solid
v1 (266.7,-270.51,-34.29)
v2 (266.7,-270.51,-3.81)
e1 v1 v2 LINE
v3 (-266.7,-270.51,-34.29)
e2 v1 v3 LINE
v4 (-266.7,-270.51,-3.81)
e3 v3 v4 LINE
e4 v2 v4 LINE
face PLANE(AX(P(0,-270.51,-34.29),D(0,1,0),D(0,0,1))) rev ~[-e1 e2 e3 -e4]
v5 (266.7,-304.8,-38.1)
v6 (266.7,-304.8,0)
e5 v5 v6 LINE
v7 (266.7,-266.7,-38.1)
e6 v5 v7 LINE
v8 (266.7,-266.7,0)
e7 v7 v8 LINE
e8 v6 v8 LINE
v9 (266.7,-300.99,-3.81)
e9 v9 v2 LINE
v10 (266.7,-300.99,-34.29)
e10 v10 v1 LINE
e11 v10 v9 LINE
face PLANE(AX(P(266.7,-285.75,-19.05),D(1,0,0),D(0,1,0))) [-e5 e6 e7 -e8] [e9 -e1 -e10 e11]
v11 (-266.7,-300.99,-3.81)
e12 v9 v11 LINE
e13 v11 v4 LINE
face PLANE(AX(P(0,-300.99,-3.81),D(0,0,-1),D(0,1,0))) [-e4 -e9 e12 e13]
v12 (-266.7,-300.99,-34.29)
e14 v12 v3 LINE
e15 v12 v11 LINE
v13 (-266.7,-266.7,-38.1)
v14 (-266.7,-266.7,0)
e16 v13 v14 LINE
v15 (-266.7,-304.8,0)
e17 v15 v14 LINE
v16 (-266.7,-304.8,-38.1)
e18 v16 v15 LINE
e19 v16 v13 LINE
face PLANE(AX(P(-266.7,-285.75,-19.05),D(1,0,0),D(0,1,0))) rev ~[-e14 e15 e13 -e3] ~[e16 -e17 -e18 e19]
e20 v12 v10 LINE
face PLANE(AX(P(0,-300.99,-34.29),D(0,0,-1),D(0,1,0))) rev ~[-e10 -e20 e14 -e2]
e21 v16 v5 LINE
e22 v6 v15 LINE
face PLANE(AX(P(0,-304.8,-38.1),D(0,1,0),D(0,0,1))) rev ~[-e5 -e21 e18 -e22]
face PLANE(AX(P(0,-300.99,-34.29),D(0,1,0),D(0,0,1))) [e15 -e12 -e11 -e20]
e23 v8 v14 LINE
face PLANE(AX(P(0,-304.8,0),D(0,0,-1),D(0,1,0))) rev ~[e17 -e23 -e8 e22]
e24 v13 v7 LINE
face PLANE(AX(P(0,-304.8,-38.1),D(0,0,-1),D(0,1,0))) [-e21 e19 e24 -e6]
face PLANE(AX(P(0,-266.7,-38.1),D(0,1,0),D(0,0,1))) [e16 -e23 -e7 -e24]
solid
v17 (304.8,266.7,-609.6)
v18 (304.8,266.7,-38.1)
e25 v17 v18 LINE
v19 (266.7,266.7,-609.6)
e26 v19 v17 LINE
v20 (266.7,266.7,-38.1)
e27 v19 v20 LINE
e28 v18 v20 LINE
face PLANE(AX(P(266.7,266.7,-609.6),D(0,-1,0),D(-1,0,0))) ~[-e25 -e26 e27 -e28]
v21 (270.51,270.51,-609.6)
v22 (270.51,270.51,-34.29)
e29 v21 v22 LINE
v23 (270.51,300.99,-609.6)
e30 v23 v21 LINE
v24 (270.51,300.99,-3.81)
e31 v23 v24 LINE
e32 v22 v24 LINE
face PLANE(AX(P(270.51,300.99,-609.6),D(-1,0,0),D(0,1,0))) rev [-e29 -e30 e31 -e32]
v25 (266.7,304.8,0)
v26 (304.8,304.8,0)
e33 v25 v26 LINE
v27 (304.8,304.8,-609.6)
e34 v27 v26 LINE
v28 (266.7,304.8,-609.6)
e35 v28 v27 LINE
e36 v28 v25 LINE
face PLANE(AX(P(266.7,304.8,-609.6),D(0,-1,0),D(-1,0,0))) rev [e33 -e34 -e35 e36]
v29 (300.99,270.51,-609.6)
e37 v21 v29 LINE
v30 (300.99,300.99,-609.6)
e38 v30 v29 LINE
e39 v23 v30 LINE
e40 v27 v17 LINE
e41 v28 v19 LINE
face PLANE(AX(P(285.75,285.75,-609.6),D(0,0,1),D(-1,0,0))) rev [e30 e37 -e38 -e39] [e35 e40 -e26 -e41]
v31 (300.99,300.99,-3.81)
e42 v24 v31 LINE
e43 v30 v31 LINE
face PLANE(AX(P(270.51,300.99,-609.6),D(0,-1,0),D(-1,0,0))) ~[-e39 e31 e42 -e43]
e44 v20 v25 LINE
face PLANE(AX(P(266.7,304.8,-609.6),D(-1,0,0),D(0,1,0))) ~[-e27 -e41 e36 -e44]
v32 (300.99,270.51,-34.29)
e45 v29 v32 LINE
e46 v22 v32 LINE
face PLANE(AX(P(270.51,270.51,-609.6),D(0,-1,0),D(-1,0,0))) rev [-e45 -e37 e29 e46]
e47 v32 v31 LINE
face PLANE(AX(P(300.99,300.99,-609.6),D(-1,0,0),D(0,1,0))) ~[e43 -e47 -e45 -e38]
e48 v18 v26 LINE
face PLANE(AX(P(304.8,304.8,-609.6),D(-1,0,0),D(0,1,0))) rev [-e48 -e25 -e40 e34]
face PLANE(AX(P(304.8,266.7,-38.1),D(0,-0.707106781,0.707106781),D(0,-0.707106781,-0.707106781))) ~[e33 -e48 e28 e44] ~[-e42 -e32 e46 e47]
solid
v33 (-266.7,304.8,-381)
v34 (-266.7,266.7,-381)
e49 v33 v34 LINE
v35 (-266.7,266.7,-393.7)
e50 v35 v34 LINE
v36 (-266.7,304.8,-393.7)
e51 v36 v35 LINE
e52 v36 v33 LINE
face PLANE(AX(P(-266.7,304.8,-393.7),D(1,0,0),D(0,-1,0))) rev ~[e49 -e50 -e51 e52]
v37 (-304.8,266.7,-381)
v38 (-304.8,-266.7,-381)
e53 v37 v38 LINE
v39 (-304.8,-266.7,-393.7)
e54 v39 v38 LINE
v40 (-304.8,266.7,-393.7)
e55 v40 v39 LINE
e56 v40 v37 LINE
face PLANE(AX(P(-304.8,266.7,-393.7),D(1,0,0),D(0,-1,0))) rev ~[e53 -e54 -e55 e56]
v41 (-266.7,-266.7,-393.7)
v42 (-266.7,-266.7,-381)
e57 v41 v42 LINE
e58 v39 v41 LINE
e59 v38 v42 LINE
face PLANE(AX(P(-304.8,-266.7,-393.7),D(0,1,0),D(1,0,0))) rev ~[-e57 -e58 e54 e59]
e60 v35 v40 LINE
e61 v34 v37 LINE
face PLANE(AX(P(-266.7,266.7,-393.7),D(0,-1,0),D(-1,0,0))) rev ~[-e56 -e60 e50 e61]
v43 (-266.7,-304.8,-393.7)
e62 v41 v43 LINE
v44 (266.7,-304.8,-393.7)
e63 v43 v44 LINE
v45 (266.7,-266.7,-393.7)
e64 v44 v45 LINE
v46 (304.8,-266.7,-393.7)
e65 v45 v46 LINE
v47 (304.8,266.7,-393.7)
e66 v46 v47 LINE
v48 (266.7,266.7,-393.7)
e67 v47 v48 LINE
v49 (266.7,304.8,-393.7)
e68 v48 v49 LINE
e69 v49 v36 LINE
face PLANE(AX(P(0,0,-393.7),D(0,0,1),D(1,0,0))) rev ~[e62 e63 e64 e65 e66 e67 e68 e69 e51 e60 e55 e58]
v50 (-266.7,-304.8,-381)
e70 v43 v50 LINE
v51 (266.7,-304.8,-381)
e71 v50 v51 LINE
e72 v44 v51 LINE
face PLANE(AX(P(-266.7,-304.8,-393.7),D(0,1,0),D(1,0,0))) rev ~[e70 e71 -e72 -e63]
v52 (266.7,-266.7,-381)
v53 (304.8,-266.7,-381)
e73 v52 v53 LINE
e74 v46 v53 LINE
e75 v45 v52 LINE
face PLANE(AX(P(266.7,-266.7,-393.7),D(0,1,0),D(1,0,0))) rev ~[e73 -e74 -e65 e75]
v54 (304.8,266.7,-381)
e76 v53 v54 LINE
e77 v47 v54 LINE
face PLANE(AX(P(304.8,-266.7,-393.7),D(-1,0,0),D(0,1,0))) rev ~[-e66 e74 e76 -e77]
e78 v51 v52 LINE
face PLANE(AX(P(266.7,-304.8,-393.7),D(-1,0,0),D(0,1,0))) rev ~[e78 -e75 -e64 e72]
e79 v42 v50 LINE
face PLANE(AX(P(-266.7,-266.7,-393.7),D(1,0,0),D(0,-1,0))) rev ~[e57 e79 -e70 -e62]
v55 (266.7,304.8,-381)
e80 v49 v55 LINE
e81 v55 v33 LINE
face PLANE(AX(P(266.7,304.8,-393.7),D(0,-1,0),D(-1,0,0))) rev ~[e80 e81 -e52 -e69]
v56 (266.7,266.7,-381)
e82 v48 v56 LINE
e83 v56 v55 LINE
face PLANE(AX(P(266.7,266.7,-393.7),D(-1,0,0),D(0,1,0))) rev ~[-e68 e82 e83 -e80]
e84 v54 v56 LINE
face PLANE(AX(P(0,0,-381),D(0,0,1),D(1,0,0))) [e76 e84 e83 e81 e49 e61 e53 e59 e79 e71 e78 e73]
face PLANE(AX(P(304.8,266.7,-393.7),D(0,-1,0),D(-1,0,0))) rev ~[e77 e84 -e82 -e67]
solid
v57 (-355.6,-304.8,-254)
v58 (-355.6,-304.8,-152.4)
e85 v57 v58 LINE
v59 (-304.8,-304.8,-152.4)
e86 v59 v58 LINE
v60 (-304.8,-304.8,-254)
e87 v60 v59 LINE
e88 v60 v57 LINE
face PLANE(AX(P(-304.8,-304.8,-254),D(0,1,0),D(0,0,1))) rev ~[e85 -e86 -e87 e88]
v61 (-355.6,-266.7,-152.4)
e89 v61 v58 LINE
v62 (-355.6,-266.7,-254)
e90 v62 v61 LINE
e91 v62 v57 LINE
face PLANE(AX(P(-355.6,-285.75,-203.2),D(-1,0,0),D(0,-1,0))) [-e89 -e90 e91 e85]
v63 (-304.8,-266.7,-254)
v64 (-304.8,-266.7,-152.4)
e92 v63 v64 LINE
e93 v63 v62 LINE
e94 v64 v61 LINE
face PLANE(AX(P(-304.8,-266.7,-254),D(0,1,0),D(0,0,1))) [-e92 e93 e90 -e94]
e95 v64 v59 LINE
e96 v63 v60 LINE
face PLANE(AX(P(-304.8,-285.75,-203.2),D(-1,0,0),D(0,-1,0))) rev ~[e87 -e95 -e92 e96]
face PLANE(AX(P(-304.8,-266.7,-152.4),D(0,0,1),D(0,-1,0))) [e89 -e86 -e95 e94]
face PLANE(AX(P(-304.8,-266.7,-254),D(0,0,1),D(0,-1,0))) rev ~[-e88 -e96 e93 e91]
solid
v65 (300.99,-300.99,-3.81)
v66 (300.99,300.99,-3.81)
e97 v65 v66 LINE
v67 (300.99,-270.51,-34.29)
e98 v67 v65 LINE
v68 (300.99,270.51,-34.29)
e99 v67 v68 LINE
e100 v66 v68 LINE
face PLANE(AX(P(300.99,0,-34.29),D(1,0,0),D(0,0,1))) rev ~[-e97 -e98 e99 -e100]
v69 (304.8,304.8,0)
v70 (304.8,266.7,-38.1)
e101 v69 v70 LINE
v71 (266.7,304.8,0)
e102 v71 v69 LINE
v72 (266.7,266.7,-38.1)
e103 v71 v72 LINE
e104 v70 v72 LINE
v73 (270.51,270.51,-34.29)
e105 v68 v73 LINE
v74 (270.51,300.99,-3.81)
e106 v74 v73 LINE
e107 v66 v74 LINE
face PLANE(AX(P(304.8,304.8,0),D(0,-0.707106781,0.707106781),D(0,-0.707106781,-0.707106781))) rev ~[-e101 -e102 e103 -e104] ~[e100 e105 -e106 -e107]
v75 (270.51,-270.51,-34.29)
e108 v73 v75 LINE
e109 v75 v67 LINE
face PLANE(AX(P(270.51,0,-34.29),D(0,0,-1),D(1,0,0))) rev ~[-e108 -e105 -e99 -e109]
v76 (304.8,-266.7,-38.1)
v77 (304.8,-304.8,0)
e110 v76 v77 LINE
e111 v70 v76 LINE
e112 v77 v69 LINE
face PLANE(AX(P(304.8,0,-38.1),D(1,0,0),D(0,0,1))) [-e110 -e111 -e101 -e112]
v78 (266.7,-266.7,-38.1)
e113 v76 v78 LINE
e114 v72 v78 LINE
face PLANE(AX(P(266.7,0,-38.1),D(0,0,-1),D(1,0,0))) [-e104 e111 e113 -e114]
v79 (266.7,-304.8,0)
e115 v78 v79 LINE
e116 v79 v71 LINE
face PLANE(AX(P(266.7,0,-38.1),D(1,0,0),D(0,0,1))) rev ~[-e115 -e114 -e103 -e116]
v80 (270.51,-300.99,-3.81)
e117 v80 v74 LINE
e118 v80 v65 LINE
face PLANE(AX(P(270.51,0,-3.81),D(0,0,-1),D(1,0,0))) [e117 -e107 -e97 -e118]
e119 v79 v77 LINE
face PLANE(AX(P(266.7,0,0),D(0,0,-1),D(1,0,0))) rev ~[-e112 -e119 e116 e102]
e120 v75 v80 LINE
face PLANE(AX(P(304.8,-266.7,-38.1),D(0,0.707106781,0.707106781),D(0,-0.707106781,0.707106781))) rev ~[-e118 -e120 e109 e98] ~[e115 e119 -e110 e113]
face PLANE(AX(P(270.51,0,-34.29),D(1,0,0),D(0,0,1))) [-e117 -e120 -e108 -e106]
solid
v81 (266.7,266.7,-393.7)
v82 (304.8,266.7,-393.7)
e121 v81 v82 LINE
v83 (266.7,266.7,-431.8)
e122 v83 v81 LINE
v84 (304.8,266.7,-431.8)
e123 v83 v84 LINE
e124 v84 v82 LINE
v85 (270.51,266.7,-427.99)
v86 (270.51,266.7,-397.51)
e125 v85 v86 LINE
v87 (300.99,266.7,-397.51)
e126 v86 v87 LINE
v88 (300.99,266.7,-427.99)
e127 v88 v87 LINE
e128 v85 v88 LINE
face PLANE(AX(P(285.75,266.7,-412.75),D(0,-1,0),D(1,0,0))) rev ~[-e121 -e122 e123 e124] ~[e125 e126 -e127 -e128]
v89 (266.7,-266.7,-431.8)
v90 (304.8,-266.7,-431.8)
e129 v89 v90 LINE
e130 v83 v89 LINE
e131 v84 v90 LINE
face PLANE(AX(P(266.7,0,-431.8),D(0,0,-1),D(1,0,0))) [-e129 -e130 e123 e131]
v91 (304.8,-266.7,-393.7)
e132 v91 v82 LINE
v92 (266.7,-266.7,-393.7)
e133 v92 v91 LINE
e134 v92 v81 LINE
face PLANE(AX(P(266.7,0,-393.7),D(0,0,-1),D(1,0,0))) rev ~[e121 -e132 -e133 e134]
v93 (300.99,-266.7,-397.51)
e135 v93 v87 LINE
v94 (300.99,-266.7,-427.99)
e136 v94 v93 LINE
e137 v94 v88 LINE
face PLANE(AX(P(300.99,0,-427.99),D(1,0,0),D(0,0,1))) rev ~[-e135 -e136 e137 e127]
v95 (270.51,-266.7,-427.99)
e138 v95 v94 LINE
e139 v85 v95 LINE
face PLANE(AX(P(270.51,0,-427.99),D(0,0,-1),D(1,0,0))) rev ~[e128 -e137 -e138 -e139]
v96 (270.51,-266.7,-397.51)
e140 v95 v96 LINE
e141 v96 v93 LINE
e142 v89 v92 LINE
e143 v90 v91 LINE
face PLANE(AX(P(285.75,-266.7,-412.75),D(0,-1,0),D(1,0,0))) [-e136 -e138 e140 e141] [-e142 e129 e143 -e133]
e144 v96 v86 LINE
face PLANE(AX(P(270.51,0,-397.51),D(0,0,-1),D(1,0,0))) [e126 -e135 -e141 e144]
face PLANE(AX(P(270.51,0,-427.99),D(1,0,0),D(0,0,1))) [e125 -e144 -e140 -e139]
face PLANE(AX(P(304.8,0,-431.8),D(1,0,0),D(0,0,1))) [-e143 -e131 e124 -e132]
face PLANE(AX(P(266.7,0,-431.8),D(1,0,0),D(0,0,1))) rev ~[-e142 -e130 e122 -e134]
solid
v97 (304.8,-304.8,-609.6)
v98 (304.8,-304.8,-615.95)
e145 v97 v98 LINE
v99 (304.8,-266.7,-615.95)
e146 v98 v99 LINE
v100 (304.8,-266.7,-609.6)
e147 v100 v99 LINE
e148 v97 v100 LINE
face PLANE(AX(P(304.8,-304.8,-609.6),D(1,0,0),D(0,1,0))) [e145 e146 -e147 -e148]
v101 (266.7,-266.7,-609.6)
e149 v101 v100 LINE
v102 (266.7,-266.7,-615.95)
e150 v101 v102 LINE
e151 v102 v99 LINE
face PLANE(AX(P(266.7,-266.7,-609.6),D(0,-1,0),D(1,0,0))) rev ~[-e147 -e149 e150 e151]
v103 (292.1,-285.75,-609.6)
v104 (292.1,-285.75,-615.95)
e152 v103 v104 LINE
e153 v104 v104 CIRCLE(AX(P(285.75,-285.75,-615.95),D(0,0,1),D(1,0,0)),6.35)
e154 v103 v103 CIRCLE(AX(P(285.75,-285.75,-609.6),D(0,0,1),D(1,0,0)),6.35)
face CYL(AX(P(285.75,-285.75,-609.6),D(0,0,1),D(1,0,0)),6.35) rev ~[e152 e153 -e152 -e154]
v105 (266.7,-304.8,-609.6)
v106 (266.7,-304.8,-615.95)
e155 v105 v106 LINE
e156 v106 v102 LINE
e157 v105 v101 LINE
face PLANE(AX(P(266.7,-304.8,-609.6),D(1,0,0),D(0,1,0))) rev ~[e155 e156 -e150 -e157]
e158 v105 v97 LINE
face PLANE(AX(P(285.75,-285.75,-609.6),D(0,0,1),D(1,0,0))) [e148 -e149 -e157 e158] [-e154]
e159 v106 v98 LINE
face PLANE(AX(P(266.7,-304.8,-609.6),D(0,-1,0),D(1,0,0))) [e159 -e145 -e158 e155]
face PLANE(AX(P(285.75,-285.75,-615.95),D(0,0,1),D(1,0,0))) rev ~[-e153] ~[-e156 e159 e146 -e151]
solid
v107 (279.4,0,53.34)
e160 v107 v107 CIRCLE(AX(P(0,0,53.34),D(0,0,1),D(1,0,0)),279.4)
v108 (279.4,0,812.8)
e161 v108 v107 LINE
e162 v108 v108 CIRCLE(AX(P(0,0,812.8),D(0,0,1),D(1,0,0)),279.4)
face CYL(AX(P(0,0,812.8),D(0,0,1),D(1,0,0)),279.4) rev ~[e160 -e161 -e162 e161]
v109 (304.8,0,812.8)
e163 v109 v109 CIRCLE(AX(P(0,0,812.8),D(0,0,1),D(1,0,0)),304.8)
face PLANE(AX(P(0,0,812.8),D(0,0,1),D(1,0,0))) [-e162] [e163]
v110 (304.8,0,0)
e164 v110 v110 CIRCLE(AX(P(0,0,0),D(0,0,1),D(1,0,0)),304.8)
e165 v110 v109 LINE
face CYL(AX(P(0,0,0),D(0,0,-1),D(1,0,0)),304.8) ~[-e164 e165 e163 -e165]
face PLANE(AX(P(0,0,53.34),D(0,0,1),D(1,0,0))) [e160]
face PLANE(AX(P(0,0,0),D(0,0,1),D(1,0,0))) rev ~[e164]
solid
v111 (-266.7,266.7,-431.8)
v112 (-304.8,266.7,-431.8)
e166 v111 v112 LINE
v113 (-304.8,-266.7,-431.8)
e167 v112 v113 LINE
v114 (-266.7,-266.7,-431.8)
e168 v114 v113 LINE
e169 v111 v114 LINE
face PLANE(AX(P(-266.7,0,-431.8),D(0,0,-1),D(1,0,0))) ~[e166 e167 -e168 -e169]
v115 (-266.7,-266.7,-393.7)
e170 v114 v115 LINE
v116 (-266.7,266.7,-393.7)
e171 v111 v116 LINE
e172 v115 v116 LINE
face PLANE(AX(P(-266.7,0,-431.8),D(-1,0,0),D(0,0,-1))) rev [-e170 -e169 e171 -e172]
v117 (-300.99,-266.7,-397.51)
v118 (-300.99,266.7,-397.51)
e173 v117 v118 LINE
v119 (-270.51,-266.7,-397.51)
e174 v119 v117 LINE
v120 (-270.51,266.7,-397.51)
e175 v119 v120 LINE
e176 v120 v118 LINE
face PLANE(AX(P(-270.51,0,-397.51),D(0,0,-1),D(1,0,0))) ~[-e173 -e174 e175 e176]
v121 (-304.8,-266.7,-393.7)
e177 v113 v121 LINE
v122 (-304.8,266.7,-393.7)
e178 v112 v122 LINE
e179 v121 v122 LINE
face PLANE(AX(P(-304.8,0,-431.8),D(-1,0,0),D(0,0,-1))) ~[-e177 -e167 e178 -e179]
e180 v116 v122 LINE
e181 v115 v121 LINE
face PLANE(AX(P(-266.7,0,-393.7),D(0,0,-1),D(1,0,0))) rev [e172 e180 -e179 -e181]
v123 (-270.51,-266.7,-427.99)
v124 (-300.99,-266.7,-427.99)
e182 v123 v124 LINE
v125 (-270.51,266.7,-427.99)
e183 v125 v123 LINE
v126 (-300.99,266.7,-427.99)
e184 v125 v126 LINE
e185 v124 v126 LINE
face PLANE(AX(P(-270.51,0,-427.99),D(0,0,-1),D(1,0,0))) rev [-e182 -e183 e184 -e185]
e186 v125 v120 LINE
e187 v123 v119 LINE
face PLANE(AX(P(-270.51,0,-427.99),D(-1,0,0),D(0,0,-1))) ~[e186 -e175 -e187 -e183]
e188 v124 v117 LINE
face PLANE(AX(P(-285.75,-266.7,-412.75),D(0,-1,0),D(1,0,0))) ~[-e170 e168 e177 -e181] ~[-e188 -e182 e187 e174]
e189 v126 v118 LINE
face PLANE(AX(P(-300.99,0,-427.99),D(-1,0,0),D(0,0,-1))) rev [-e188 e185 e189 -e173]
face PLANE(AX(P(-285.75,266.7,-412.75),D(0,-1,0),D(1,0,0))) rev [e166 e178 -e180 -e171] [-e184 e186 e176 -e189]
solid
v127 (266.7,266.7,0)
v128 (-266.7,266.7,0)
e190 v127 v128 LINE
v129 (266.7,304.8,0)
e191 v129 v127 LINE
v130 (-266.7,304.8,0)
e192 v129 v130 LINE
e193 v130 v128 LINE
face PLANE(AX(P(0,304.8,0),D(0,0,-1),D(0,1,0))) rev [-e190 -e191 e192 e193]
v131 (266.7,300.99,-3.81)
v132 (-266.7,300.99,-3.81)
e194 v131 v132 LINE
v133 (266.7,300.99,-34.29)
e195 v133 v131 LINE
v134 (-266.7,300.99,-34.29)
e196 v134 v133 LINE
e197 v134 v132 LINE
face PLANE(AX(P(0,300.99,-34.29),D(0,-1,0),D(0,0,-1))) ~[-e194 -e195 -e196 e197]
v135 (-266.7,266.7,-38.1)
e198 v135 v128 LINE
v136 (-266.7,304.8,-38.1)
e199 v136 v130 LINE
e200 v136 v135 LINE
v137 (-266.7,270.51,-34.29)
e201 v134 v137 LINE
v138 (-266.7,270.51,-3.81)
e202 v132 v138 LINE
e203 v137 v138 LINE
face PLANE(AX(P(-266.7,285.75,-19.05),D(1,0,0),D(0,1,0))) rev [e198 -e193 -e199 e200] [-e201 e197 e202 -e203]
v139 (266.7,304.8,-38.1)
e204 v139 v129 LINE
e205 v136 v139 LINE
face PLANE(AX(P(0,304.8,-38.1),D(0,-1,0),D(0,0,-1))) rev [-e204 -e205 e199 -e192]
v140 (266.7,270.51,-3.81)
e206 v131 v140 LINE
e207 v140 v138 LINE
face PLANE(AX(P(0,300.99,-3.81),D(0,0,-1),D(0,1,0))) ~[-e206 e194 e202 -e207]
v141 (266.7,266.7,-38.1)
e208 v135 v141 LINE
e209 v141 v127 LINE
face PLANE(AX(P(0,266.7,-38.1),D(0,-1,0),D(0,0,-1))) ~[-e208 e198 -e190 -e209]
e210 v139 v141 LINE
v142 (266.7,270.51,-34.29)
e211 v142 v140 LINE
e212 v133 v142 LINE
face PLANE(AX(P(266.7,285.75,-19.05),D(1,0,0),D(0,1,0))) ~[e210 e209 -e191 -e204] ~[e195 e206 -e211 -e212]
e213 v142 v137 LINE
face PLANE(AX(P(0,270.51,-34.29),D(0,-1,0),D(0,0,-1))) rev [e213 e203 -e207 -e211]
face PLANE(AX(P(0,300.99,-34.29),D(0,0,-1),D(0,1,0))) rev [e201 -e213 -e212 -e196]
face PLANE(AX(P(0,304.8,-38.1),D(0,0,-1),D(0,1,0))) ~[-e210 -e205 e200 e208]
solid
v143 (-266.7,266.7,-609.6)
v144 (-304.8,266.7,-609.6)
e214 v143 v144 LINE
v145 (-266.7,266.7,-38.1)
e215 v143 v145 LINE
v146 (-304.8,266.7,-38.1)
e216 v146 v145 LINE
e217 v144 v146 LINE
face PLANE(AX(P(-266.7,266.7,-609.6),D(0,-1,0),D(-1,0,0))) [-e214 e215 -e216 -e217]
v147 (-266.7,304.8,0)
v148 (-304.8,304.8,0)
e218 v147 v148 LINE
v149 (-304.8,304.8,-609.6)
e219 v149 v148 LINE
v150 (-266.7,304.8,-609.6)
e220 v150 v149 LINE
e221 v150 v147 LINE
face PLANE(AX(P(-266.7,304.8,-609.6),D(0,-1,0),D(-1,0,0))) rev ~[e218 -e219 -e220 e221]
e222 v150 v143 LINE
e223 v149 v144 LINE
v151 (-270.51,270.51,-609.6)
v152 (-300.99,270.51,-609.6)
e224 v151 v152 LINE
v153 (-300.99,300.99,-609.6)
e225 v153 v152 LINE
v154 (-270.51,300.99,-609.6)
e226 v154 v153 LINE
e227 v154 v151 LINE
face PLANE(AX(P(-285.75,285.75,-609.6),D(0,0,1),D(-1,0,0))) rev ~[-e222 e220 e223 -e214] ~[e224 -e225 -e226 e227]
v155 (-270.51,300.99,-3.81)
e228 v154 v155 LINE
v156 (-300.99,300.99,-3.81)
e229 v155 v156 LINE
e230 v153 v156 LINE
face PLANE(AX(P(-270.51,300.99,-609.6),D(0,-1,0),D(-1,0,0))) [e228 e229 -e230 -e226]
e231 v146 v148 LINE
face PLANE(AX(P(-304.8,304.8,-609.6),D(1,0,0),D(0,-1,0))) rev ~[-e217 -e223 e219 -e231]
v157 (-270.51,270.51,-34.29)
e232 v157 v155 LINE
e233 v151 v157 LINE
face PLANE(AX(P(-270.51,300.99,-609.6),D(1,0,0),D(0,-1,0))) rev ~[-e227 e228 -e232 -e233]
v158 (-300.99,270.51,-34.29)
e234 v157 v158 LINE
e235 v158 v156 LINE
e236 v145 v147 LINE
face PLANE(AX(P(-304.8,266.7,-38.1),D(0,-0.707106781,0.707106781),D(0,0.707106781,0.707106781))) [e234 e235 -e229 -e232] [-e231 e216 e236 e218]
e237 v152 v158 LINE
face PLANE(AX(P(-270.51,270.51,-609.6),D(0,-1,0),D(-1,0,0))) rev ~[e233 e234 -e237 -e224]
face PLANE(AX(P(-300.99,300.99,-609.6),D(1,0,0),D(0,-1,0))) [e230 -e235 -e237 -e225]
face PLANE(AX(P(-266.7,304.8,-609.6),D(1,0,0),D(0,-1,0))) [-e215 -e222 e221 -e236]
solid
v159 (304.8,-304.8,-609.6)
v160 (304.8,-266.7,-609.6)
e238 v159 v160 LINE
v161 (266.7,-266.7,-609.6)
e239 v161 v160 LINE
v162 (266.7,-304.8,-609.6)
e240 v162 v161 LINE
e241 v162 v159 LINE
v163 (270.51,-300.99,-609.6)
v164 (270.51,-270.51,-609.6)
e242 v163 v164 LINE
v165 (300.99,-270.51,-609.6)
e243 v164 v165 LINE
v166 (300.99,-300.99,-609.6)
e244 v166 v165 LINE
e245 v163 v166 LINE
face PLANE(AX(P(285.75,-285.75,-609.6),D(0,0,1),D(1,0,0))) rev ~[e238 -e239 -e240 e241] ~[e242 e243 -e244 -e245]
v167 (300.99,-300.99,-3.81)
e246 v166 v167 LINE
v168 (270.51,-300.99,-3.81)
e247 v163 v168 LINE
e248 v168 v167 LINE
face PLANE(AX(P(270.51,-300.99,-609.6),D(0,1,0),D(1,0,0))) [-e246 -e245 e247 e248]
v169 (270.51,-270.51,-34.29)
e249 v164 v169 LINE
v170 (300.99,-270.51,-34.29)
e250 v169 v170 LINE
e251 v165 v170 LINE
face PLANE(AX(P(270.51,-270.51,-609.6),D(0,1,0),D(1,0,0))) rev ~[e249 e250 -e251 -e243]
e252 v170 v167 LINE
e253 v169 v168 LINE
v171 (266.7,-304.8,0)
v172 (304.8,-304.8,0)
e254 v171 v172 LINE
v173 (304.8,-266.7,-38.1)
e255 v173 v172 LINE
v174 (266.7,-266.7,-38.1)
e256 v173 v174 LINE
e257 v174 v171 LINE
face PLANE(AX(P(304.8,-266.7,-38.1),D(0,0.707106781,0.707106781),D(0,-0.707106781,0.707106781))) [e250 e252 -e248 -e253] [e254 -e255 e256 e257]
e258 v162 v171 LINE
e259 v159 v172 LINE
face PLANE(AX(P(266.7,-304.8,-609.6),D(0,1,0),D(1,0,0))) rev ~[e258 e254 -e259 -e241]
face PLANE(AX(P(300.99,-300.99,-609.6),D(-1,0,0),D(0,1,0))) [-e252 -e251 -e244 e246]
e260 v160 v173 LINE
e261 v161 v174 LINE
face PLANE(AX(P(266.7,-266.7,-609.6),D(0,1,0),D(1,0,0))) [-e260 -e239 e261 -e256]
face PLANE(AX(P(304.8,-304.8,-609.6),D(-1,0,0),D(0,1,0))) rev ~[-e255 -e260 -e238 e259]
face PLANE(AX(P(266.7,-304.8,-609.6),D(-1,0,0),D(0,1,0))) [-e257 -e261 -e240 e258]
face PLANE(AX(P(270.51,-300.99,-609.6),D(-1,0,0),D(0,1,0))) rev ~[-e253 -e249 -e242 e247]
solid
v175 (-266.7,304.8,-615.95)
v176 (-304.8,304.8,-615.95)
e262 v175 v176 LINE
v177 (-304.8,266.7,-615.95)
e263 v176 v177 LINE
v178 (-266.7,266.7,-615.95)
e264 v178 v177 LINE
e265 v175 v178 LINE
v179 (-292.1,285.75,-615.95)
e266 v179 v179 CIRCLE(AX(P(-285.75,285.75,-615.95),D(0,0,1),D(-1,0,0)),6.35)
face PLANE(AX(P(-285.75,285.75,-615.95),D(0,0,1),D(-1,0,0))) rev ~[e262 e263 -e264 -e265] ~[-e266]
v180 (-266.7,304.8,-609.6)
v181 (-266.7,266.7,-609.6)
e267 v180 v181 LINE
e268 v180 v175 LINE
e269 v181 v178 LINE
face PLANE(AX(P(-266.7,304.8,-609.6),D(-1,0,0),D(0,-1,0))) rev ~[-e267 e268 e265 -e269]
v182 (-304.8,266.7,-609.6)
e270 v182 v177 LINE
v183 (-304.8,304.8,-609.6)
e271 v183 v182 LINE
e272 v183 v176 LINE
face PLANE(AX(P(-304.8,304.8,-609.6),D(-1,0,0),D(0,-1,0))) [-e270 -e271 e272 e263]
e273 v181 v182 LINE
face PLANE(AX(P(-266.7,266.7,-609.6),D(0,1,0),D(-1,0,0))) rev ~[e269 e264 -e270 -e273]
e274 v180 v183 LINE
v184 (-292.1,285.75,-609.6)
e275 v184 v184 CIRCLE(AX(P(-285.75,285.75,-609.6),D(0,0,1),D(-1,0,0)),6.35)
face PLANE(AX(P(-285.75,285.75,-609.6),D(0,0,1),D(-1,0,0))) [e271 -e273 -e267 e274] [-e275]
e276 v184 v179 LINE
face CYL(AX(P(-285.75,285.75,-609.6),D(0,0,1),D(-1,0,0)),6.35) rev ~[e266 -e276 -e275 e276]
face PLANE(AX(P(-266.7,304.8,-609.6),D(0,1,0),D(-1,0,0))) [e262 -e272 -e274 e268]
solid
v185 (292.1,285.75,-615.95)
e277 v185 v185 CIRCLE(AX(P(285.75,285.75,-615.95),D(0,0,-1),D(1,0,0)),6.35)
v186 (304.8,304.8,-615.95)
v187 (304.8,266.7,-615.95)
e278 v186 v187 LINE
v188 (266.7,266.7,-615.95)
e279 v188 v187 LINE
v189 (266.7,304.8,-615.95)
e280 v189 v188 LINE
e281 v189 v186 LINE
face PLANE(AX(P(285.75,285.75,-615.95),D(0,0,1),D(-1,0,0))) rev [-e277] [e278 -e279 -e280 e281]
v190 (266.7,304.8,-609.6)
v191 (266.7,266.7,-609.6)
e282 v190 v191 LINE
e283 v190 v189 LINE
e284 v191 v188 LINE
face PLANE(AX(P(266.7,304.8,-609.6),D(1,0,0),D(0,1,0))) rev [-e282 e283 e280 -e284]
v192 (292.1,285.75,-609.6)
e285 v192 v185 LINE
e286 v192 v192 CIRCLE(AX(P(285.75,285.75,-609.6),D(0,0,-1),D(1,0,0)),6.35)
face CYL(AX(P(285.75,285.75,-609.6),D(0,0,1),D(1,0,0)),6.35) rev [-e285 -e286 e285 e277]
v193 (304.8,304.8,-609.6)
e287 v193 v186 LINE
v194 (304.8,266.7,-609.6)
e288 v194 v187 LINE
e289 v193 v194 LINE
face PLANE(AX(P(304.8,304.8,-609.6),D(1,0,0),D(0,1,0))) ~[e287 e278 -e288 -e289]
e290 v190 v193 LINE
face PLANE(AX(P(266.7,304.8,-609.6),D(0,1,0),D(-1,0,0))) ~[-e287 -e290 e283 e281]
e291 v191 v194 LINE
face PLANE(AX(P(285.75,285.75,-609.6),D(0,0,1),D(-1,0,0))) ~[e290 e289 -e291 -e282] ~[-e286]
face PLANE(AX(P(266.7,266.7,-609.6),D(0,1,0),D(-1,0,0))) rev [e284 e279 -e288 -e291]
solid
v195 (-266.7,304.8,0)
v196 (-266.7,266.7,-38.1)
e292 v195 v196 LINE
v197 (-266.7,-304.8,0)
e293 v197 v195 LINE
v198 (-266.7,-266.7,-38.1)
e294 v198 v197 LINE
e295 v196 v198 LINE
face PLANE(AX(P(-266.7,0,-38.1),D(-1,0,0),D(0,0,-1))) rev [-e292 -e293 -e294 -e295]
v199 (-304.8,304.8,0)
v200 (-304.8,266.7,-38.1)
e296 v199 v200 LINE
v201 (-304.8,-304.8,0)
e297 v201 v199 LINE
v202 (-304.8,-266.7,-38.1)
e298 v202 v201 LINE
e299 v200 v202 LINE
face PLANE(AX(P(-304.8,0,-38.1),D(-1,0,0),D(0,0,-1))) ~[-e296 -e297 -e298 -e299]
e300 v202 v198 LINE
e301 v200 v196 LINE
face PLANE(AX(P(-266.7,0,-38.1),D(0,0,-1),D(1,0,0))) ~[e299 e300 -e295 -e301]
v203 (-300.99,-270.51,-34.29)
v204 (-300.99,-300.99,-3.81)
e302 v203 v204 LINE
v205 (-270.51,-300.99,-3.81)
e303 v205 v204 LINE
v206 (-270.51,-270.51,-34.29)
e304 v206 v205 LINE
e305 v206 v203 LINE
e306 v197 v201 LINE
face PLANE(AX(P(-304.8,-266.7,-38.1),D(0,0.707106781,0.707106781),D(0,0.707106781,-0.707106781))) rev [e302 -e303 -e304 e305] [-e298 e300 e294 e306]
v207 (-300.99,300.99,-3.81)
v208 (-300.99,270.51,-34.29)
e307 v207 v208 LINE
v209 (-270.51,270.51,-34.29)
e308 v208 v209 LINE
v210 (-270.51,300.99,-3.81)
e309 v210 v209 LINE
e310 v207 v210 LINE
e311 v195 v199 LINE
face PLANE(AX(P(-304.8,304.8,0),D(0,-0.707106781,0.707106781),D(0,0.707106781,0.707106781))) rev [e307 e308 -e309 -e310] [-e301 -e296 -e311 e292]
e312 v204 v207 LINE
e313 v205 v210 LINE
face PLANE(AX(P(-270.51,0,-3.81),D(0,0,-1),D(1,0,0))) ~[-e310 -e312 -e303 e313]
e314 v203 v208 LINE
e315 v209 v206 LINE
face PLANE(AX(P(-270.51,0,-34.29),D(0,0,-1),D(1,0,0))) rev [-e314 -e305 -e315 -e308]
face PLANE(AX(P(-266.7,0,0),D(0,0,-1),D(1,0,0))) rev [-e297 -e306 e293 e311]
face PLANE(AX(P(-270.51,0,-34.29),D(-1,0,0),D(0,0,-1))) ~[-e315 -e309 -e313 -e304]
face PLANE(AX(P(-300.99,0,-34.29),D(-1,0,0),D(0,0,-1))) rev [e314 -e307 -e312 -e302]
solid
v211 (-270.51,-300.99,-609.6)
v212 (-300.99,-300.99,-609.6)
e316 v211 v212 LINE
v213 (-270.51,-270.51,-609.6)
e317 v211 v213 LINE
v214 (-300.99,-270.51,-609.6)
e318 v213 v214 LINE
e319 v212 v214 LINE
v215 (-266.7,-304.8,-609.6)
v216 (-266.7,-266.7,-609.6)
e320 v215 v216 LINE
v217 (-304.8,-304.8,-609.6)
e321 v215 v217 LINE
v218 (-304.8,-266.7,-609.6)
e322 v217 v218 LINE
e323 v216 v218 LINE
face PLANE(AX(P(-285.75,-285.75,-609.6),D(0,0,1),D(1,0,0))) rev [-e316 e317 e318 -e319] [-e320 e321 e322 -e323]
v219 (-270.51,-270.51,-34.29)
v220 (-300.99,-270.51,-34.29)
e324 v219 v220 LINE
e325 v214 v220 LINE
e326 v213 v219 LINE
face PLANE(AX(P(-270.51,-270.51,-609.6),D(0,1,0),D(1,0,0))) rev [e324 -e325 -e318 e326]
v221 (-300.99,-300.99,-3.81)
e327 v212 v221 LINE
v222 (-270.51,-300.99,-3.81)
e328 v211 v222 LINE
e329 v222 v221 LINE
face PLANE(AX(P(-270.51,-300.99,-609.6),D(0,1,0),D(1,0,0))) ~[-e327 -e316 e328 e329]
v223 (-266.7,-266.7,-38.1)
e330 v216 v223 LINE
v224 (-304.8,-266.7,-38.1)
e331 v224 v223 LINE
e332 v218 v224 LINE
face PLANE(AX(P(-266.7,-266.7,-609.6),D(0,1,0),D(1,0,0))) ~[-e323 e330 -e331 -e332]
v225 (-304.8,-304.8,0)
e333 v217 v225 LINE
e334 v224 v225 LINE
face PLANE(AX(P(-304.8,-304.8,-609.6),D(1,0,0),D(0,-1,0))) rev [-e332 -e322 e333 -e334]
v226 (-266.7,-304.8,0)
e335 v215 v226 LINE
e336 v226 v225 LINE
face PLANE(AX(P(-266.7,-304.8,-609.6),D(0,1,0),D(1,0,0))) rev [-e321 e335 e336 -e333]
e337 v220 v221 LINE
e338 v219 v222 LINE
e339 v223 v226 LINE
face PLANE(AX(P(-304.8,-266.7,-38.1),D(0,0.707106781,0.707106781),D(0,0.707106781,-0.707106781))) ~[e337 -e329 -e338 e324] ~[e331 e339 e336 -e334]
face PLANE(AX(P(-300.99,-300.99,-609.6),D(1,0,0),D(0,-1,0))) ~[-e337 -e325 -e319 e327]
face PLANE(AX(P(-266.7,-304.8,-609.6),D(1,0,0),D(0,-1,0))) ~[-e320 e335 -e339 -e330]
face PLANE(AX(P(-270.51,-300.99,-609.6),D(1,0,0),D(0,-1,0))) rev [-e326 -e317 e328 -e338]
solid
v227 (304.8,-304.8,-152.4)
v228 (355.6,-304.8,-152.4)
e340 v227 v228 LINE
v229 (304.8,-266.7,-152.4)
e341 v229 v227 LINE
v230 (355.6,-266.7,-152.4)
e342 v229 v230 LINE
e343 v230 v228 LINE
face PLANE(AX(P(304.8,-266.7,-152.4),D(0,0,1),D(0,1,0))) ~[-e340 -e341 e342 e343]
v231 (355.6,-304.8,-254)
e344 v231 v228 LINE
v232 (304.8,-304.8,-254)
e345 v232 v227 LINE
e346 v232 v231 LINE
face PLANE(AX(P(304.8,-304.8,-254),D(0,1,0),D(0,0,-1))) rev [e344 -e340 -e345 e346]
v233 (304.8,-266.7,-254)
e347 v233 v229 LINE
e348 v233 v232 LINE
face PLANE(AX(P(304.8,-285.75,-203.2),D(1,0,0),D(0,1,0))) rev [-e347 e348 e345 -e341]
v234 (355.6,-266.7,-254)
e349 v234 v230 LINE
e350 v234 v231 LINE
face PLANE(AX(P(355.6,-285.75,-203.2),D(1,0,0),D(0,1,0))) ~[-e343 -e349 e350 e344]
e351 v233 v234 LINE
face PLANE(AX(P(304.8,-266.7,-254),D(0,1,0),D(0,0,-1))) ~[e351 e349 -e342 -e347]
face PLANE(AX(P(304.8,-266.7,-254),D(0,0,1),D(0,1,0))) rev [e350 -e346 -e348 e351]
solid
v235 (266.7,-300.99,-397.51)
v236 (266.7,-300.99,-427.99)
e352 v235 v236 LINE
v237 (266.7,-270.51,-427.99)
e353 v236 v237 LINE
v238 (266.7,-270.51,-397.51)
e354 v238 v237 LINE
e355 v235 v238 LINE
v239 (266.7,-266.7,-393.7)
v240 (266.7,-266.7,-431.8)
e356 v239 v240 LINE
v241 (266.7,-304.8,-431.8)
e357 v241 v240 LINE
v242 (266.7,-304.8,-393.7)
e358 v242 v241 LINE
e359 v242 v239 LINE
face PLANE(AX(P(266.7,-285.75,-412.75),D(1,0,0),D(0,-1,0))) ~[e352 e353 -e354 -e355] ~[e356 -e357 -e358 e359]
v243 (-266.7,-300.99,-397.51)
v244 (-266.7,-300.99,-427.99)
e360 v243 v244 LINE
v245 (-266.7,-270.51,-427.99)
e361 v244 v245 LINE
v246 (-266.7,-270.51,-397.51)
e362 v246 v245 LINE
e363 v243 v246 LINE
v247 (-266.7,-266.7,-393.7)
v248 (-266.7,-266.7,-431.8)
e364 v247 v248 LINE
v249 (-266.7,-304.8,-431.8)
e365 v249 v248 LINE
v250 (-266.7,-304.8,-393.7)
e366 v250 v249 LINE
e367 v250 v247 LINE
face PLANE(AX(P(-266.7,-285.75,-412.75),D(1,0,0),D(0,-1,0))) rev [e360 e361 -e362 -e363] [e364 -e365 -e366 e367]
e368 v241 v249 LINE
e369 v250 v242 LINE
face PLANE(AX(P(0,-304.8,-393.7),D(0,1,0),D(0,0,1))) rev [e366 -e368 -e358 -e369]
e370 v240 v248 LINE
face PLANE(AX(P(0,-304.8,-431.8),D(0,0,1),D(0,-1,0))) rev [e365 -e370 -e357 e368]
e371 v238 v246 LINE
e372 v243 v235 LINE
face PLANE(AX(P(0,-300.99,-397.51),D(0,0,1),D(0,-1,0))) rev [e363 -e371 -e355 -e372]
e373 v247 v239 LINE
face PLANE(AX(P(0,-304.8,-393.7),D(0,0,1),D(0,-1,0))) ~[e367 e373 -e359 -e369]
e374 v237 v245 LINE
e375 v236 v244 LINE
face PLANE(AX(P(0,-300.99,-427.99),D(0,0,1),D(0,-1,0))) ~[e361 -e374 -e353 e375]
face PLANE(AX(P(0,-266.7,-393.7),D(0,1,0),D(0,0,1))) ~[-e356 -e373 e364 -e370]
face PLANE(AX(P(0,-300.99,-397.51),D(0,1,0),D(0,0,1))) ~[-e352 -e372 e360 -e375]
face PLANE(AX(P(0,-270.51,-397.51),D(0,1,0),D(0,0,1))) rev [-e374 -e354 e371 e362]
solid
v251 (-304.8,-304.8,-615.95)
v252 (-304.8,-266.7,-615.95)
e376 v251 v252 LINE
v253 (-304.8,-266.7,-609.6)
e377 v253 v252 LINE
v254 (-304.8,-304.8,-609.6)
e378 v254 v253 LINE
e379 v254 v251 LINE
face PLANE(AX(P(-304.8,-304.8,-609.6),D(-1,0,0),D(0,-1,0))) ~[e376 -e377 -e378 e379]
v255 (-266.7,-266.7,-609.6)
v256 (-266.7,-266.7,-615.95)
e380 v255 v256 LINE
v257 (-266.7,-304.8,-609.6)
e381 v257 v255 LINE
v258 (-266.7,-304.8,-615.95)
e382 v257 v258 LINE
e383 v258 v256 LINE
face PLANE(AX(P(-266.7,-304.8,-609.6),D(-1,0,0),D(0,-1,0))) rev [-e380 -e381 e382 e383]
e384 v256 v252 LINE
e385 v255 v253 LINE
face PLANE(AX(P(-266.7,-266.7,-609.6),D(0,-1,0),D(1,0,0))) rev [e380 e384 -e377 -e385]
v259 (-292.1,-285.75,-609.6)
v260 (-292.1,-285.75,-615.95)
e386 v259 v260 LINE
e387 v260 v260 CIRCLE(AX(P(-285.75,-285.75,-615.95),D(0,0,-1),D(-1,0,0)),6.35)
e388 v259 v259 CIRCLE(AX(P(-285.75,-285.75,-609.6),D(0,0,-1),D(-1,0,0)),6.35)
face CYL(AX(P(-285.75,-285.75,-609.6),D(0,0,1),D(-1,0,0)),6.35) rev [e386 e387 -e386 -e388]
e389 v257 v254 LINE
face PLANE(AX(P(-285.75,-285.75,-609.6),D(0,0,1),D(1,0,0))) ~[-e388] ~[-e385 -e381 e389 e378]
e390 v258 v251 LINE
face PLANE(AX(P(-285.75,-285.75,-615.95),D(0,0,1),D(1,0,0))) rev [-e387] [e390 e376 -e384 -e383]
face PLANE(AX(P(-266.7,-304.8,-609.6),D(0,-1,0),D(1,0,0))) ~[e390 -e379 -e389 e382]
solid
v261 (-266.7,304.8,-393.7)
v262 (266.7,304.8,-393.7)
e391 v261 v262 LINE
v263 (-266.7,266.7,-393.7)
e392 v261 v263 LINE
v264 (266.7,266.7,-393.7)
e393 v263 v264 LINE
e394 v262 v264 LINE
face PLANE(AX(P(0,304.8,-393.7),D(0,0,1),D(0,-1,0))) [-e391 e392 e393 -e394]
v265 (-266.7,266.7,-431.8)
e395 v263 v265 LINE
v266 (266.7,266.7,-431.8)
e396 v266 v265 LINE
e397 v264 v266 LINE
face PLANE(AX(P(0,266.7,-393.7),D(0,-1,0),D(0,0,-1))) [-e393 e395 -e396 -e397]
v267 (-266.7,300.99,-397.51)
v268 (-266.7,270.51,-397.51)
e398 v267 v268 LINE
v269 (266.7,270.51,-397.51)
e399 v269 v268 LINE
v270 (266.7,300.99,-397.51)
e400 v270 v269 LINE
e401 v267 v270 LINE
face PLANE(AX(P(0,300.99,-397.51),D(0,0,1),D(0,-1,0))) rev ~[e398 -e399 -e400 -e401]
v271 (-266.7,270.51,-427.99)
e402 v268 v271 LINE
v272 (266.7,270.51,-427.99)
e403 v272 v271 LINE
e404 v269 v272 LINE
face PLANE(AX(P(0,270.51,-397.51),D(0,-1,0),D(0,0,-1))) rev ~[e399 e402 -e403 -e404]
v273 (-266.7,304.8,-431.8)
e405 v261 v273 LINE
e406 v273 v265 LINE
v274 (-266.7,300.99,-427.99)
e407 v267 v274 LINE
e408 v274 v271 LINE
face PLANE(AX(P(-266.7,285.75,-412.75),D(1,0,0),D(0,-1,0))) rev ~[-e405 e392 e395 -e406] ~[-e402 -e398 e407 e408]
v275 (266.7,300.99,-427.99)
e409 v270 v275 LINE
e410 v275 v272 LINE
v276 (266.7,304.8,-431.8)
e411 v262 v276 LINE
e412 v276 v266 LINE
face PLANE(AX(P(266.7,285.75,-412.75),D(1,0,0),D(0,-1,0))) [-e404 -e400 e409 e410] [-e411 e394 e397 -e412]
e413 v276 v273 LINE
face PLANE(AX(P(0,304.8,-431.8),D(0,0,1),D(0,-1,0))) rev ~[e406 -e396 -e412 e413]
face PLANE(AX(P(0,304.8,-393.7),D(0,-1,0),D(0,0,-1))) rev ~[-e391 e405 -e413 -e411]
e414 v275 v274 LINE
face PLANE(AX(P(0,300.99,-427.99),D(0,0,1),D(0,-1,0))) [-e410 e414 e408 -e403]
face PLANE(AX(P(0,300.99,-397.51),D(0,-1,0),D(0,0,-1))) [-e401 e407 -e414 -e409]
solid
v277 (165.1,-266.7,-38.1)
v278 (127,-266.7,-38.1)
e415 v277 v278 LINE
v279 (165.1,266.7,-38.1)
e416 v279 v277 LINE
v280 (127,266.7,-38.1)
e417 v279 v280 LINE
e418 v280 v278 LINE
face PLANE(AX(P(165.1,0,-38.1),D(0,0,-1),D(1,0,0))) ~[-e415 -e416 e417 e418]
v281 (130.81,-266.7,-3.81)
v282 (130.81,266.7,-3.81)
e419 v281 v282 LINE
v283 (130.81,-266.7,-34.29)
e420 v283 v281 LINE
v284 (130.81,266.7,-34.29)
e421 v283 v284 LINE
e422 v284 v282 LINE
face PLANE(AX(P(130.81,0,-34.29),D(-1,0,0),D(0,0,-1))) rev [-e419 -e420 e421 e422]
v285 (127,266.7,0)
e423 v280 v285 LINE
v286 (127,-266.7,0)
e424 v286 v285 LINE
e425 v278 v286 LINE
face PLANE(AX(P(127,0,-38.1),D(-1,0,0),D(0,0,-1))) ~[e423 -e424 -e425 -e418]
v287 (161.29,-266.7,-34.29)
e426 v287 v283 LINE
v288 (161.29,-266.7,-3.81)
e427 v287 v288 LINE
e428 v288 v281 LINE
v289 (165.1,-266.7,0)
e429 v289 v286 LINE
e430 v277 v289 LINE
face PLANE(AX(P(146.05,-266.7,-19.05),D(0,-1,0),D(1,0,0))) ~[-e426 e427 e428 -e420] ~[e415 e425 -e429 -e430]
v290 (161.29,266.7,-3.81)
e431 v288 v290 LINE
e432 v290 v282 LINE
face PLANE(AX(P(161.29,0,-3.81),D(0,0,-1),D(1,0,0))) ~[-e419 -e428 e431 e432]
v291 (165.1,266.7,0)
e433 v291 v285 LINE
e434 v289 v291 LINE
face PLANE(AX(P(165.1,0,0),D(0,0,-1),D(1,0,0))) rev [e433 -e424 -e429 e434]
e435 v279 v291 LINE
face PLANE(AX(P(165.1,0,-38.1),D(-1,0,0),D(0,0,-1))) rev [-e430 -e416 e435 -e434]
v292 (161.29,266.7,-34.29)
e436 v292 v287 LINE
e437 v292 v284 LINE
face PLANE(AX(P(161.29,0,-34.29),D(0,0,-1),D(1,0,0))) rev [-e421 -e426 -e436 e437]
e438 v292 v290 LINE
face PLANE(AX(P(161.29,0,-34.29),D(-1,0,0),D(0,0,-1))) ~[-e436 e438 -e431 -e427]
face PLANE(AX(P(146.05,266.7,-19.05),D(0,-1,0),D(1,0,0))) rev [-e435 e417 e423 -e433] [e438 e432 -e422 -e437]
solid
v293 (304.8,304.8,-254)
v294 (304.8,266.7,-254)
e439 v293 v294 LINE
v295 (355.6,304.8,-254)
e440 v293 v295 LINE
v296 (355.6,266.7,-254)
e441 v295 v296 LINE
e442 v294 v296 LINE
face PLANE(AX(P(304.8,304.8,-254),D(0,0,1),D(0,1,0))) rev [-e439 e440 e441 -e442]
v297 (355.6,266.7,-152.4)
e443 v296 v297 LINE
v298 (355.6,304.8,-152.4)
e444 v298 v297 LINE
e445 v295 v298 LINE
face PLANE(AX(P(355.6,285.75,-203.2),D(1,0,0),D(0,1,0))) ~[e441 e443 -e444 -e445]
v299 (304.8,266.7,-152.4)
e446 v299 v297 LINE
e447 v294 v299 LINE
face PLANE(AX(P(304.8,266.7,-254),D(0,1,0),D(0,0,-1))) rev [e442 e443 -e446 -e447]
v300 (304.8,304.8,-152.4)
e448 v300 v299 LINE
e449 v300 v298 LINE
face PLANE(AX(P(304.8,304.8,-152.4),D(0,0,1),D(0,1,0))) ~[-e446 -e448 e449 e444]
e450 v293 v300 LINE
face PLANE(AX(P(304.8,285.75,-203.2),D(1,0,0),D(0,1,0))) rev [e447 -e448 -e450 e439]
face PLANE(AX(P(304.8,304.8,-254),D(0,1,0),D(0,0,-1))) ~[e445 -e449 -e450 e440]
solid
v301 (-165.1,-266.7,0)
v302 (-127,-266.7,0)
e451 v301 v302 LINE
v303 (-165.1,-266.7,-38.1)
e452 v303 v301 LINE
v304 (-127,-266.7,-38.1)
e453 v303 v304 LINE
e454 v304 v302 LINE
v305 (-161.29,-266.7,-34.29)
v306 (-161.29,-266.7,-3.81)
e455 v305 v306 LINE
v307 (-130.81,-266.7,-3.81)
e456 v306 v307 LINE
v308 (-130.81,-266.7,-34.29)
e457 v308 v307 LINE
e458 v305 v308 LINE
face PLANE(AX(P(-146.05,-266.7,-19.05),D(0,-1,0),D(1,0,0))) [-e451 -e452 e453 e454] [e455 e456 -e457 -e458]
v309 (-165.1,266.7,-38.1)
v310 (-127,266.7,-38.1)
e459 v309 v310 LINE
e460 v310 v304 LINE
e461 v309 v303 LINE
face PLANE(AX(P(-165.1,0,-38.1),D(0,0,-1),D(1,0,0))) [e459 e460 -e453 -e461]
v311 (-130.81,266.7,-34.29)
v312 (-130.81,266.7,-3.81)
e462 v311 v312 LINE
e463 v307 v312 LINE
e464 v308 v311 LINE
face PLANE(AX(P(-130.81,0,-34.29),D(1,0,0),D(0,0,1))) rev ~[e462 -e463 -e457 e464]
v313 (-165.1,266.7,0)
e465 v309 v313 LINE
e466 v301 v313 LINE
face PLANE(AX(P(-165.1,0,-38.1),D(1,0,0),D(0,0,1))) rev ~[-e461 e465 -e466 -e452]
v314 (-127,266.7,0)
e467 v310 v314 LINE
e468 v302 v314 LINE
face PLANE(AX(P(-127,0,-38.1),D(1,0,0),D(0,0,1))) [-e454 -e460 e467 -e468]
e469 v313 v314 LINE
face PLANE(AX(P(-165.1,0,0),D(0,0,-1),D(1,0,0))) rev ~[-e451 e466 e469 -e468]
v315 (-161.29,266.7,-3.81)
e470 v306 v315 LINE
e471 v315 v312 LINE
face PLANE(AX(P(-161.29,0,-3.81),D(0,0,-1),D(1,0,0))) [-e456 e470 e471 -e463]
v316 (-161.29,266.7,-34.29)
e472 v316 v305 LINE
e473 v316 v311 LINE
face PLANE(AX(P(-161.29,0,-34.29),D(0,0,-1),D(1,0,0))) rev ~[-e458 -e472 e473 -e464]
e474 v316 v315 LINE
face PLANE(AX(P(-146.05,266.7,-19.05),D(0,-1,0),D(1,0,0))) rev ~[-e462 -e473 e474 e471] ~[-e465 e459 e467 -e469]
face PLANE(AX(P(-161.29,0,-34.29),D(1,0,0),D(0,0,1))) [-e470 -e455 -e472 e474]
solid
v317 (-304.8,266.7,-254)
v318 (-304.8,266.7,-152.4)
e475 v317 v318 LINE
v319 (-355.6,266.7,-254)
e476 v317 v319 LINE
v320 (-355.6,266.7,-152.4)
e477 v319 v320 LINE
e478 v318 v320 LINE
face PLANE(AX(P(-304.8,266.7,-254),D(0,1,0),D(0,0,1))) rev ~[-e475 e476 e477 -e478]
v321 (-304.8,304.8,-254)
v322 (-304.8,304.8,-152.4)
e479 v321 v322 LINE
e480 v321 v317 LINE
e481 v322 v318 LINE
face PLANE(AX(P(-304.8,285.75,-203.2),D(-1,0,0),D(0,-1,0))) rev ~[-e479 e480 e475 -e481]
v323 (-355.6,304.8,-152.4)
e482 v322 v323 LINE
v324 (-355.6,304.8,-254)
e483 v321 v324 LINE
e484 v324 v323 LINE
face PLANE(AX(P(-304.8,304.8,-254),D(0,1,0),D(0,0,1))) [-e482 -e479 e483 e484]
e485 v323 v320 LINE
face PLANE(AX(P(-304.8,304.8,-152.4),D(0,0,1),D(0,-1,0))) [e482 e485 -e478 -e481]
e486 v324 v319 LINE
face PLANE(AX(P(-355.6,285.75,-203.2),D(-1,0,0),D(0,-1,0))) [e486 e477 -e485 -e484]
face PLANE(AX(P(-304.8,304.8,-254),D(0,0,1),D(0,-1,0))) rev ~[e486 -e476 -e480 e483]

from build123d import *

# Parameters (mm, degrees)
F0_R           = 304.8
F1_DEPTH       = 812.8
F2_W           = 38.1
F2_H           = 38.1
F2_W_2         = 30.48
F2_H_2         = 30.48
F3_DEPTH       = 304.8
F5_DEPTH       = 38.1
F8_W           = 38.1
F8_H           = 38.1
F8_W_2         = 30.48
F8_H_2         = 30.48
F9_REACH       = 1476.2825367264
F12_W          = 38.1
F12_H          = 38.1
F12_W_2        = 30.48
F12_H_2        = 30.48
F13_DEPTH      = 266.7
F13_DEPTH_BACK = 266.7
F17_W          = 38.1
F17_H          = 38.1
F17_W_2        = 30.48
F17_H_2        = 30.48
F18_DEPTH      = 266.7
F18_DEPTH_BACK = 266.7
F20_W          = 38.1
F20_H          = 38.1
F20_W_2        = 30.48
F20_H_2        = 30.48
F21_DEPTH      = 266.7
F21_DEPTH_BACK = 266.7
F24_DEPTH      = 12.7
F25_W          = 38.1
F25_H          = 38.1
F25_R          = 6.35
F26_DEPTH      = 6.35
F29_R          = 279.4
F30_DEPTH      = 759.46
F31_W          = 38.1
F31_H          = 101.6
F32_DEPTH      = 50.8


with BuildPart() as f1:
    # F0 (on Top) → F1 (new body)
    with BuildSketch(Plane.XY):
        Circle(F0_R)
    extrude(amount=F1_DEPTH)

    # F29 (on face) → F30 (cut)
    with BuildSketch(Plane.XY.offset(812.8)):
        Circle(F29_R)
    extrude(amount=-F30_DEPTH, mode=Mode.SUBTRACT)


with BuildPart() as f3:
    # F2 (on Front) → F3 (new body, symmetric)
    with BuildSketch(Plane.XZ):
        with Locations((285.75, -19.05)):
            Rectangle(F2_W, F2_H)
        with Locations((285.75, -19.05)):
            Rectangle(F2_W_2, F2_H_2, mode=Mode.SUBTRACT)
    extrude(amount=F3_DEPTH, both=True)

    # F4 (on face) → F5 (cut, through all)
    with BuildSketch(Plane.YZ.offset(304.8)):
        Polygon((-266.7, -38.1), (-304.8, 0), (-315.9340023994, 0), (-315.9340023994, -51.912445575), (-266.7, -51.912445575), align=None)
        Polygon((315.9340023994, -51.912445575), (315.9340023994, 0), (304.8, 0), (266.7, -38.1), (266.7, -51.912445575), align=None)
    extrude(amount=-F5_DEPTH, mode=Mode.SUBTRACT)


with BuildPart() as f6_1:
    # F6: instance of F3
    add(f3.part.mirror(Plane.YZ))


with BuildPart() as f9:
    f9_end = f3.part.faces().sort_by_distance((285.75, -267.166627796, -37.633372204))[0]
    # F8 (on offset) → F9 (new body, up to a face of F3 that its end follows)
    with BuildSketch(Plane.XY.offset(-609.6)):
        with Locations((285.75, -285.75)):
            Rectangle(F8_W, F8_H)
        with Locations((285.75, -285.75)):
            Rectangle(F8_W_2, F8_H_2, mode=Mode.SUBTRACT)
    f9_long = extrude(amount=F9_REACH, mode=Mode.PRIVATE)
    add(split(f9_long, bisect_by=f9_end, keep=Keep.TOP, mode=Mode.PRIVATE))


with BuildPart() as f10_1:
    # F10: instance of F9
    add(f9.part.mirror(Plane.XZ))


with BuildPart() as f11_1:
    # F11: instance of F9
    add(f9.part.mirror(Plane.YZ))


with BuildPart() as f11_2:
    # F11: instance of F10_1
    add(f10_1.part.mirror(Plane.YZ))


with BuildPart() as f13:
    # F12 (on Right) → F13 (new body, two sides)
    with BuildSketch(Plane.YZ) as f13_sk:
        with Locations((-285.75, -19.05)):
            Rectangle(F12_W, F12_H)
        with Locations((-285.75, -19.05)):
            Rectangle(F12_W_2, F12_H_2, mode=Mode.SUBTRACT)
    extrude(amount=F13_DEPTH)
    extrude(f13_sk.sketch, amount=-F13_DEPTH_BACK)


with BuildPart() as f14_1:
    # F14: instance of F13
    add(f13.part.mirror(Plane.XZ))


with BuildPart() as f16_1:
    # F16: instance of F13
    add(f13.part.mirror(Plane(origin=(0, -285.75, -215.9), x_dir=(1, 0, 0), z_dir=(0, 0, -1))))


with BuildPart() as f16_2:
    # F16: instance of F14_1
    add(f14_1.part.mirror(Plane(origin=(0, -285.75, -215.9), x_dir=(1, 0, 0), z_dir=(0, 0, -1))))


with BuildPart() as f18:
    # F17 (on Front) → F18 (new body, two sides)
    with BuildSketch(Plane.XZ) as f18_sk:
        with Locations((285.75, -412.75)):
            Rectangle(F17_W, F17_H)
        with Locations((285.75, -412.75)):
            Rectangle(F17_W_2, F17_H_2, mode=Mode.SUBTRACT)
    extrude(amount=F18_DEPTH)
    extrude(f18_sk.sketch, amount=-F18_DEPTH_BACK)


with BuildPart() as f19_1:
    # F19: instance of F18
    add(f18.part.mirror(Plane.YZ))


with BuildPart() as f21:
    # F20 (on Front) → F21 (new body, two sides)
    with BuildSketch(Plane.XZ) as f21_sk:
        with Locations((-146.05, -19.05)):
            Rectangle(F20_W, F20_H)
        with Locations((-146.05, -19.05)):
            Rectangle(F20_W_2, F20_H_2, mode=Mode.SUBTRACT)
    extrude(amount=F21_DEPTH)
    extrude(f21_sk.sketch, amount=-F21_DEPTH_BACK)


with BuildPart() as f22_1:
    # F22: instance of F21
    add(f21.part.mirror(Plane.YZ))


with BuildPart() as f24:
    # F23 (on face) → F24 (new body)
    with BuildSketch(Plane.XY.offset(-393.7)):
        Polygon((-266.6999999998, -304.8), (266.7000000002, -304.8), (266.7, -266.7000000001), (304.8, -266.7000000001), (304.8, 266.7), (266.7, 266.7), (266.7000000002, 304.8), (-266.6999999998, 304.8), (-266.6999999998, 266.7), (-304.8, 266.7), (-304.8, -266.7000000001), (-266.7, -266.7000000001), align=None)
    extrude(amount=F24_DEPTH)


with BuildPart() as f26:
    # F25 (on offset) → F26 (new body)
    with BuildSketch(Plane.XY.offset(-609.6)):
        with Locations((285.75, -285.75)):
            Rectangle(F25_W, F25_H)
        with Locations((285.75, -285.75)):
            Circle(F25_R, mode=Mode.SUBTRACT)
    extrude(amount=-F26_DEPTH)


with BuildPart() as f27_1:
    # F27: instance of F26
    add(f26.part.mirror(Plane.YZ))


with BuildPart() as f28_1:
    # F28: instance of F26
    add(f26.part.mirror(Plane.XZ))


with BuildPart() as f28_2:
    # F28: instance of F27_1
    add(f27_1.part.mirror(Plane.XZ))


with BuildPart() as f32:
    # F31 (on face) → F32 (new body)
    with BuildSketch(Plane(origin=(-304.8, 0, 0), x_dir=(0, -1, 0), z_dir=(-1, 0, 0))):
        with Locations((-285.75, -203.2)):
            Rectangle(F31_W, F31_H)
    extrude(amount=F32_DEPTH)


with BuildPart() as f32b:
    # F31 (on face) → F32, piece 2 (new body)
    with BuildSketch(Plane(origin=(-304.8, 0, 0), x_dir=(0, -1, 0), z_dir=(-1, 0, 0))):
        with Locations((285.75, -203.2)):
            Rectangle(F31_W, F31_H)
    extrude(amount=F32_DEPTH)


with BuildPart() as f33_1:
    # F33: instance of F32b
    add(f32b.part.mirror(Plane.YZ))


with BuildPart() as f33_2:
    # F33: instance of F32
    add(f32.part.mirror(Plane.YZ))


solid = Compound([f1.part, f3.part, f6_1.part, f9.part, f10_1.part, f11_1.part, f11_2.part, f13.part, f14_1.part, f16_1.part, f16_2.part, f18.part, f19_1.part, f21.part, f22_1.part, f24.part, f26.part, f27_1.part, f28_1.part, f28_2.part, f32.part, f32b.part, f33_1.part, f33_2.part])
